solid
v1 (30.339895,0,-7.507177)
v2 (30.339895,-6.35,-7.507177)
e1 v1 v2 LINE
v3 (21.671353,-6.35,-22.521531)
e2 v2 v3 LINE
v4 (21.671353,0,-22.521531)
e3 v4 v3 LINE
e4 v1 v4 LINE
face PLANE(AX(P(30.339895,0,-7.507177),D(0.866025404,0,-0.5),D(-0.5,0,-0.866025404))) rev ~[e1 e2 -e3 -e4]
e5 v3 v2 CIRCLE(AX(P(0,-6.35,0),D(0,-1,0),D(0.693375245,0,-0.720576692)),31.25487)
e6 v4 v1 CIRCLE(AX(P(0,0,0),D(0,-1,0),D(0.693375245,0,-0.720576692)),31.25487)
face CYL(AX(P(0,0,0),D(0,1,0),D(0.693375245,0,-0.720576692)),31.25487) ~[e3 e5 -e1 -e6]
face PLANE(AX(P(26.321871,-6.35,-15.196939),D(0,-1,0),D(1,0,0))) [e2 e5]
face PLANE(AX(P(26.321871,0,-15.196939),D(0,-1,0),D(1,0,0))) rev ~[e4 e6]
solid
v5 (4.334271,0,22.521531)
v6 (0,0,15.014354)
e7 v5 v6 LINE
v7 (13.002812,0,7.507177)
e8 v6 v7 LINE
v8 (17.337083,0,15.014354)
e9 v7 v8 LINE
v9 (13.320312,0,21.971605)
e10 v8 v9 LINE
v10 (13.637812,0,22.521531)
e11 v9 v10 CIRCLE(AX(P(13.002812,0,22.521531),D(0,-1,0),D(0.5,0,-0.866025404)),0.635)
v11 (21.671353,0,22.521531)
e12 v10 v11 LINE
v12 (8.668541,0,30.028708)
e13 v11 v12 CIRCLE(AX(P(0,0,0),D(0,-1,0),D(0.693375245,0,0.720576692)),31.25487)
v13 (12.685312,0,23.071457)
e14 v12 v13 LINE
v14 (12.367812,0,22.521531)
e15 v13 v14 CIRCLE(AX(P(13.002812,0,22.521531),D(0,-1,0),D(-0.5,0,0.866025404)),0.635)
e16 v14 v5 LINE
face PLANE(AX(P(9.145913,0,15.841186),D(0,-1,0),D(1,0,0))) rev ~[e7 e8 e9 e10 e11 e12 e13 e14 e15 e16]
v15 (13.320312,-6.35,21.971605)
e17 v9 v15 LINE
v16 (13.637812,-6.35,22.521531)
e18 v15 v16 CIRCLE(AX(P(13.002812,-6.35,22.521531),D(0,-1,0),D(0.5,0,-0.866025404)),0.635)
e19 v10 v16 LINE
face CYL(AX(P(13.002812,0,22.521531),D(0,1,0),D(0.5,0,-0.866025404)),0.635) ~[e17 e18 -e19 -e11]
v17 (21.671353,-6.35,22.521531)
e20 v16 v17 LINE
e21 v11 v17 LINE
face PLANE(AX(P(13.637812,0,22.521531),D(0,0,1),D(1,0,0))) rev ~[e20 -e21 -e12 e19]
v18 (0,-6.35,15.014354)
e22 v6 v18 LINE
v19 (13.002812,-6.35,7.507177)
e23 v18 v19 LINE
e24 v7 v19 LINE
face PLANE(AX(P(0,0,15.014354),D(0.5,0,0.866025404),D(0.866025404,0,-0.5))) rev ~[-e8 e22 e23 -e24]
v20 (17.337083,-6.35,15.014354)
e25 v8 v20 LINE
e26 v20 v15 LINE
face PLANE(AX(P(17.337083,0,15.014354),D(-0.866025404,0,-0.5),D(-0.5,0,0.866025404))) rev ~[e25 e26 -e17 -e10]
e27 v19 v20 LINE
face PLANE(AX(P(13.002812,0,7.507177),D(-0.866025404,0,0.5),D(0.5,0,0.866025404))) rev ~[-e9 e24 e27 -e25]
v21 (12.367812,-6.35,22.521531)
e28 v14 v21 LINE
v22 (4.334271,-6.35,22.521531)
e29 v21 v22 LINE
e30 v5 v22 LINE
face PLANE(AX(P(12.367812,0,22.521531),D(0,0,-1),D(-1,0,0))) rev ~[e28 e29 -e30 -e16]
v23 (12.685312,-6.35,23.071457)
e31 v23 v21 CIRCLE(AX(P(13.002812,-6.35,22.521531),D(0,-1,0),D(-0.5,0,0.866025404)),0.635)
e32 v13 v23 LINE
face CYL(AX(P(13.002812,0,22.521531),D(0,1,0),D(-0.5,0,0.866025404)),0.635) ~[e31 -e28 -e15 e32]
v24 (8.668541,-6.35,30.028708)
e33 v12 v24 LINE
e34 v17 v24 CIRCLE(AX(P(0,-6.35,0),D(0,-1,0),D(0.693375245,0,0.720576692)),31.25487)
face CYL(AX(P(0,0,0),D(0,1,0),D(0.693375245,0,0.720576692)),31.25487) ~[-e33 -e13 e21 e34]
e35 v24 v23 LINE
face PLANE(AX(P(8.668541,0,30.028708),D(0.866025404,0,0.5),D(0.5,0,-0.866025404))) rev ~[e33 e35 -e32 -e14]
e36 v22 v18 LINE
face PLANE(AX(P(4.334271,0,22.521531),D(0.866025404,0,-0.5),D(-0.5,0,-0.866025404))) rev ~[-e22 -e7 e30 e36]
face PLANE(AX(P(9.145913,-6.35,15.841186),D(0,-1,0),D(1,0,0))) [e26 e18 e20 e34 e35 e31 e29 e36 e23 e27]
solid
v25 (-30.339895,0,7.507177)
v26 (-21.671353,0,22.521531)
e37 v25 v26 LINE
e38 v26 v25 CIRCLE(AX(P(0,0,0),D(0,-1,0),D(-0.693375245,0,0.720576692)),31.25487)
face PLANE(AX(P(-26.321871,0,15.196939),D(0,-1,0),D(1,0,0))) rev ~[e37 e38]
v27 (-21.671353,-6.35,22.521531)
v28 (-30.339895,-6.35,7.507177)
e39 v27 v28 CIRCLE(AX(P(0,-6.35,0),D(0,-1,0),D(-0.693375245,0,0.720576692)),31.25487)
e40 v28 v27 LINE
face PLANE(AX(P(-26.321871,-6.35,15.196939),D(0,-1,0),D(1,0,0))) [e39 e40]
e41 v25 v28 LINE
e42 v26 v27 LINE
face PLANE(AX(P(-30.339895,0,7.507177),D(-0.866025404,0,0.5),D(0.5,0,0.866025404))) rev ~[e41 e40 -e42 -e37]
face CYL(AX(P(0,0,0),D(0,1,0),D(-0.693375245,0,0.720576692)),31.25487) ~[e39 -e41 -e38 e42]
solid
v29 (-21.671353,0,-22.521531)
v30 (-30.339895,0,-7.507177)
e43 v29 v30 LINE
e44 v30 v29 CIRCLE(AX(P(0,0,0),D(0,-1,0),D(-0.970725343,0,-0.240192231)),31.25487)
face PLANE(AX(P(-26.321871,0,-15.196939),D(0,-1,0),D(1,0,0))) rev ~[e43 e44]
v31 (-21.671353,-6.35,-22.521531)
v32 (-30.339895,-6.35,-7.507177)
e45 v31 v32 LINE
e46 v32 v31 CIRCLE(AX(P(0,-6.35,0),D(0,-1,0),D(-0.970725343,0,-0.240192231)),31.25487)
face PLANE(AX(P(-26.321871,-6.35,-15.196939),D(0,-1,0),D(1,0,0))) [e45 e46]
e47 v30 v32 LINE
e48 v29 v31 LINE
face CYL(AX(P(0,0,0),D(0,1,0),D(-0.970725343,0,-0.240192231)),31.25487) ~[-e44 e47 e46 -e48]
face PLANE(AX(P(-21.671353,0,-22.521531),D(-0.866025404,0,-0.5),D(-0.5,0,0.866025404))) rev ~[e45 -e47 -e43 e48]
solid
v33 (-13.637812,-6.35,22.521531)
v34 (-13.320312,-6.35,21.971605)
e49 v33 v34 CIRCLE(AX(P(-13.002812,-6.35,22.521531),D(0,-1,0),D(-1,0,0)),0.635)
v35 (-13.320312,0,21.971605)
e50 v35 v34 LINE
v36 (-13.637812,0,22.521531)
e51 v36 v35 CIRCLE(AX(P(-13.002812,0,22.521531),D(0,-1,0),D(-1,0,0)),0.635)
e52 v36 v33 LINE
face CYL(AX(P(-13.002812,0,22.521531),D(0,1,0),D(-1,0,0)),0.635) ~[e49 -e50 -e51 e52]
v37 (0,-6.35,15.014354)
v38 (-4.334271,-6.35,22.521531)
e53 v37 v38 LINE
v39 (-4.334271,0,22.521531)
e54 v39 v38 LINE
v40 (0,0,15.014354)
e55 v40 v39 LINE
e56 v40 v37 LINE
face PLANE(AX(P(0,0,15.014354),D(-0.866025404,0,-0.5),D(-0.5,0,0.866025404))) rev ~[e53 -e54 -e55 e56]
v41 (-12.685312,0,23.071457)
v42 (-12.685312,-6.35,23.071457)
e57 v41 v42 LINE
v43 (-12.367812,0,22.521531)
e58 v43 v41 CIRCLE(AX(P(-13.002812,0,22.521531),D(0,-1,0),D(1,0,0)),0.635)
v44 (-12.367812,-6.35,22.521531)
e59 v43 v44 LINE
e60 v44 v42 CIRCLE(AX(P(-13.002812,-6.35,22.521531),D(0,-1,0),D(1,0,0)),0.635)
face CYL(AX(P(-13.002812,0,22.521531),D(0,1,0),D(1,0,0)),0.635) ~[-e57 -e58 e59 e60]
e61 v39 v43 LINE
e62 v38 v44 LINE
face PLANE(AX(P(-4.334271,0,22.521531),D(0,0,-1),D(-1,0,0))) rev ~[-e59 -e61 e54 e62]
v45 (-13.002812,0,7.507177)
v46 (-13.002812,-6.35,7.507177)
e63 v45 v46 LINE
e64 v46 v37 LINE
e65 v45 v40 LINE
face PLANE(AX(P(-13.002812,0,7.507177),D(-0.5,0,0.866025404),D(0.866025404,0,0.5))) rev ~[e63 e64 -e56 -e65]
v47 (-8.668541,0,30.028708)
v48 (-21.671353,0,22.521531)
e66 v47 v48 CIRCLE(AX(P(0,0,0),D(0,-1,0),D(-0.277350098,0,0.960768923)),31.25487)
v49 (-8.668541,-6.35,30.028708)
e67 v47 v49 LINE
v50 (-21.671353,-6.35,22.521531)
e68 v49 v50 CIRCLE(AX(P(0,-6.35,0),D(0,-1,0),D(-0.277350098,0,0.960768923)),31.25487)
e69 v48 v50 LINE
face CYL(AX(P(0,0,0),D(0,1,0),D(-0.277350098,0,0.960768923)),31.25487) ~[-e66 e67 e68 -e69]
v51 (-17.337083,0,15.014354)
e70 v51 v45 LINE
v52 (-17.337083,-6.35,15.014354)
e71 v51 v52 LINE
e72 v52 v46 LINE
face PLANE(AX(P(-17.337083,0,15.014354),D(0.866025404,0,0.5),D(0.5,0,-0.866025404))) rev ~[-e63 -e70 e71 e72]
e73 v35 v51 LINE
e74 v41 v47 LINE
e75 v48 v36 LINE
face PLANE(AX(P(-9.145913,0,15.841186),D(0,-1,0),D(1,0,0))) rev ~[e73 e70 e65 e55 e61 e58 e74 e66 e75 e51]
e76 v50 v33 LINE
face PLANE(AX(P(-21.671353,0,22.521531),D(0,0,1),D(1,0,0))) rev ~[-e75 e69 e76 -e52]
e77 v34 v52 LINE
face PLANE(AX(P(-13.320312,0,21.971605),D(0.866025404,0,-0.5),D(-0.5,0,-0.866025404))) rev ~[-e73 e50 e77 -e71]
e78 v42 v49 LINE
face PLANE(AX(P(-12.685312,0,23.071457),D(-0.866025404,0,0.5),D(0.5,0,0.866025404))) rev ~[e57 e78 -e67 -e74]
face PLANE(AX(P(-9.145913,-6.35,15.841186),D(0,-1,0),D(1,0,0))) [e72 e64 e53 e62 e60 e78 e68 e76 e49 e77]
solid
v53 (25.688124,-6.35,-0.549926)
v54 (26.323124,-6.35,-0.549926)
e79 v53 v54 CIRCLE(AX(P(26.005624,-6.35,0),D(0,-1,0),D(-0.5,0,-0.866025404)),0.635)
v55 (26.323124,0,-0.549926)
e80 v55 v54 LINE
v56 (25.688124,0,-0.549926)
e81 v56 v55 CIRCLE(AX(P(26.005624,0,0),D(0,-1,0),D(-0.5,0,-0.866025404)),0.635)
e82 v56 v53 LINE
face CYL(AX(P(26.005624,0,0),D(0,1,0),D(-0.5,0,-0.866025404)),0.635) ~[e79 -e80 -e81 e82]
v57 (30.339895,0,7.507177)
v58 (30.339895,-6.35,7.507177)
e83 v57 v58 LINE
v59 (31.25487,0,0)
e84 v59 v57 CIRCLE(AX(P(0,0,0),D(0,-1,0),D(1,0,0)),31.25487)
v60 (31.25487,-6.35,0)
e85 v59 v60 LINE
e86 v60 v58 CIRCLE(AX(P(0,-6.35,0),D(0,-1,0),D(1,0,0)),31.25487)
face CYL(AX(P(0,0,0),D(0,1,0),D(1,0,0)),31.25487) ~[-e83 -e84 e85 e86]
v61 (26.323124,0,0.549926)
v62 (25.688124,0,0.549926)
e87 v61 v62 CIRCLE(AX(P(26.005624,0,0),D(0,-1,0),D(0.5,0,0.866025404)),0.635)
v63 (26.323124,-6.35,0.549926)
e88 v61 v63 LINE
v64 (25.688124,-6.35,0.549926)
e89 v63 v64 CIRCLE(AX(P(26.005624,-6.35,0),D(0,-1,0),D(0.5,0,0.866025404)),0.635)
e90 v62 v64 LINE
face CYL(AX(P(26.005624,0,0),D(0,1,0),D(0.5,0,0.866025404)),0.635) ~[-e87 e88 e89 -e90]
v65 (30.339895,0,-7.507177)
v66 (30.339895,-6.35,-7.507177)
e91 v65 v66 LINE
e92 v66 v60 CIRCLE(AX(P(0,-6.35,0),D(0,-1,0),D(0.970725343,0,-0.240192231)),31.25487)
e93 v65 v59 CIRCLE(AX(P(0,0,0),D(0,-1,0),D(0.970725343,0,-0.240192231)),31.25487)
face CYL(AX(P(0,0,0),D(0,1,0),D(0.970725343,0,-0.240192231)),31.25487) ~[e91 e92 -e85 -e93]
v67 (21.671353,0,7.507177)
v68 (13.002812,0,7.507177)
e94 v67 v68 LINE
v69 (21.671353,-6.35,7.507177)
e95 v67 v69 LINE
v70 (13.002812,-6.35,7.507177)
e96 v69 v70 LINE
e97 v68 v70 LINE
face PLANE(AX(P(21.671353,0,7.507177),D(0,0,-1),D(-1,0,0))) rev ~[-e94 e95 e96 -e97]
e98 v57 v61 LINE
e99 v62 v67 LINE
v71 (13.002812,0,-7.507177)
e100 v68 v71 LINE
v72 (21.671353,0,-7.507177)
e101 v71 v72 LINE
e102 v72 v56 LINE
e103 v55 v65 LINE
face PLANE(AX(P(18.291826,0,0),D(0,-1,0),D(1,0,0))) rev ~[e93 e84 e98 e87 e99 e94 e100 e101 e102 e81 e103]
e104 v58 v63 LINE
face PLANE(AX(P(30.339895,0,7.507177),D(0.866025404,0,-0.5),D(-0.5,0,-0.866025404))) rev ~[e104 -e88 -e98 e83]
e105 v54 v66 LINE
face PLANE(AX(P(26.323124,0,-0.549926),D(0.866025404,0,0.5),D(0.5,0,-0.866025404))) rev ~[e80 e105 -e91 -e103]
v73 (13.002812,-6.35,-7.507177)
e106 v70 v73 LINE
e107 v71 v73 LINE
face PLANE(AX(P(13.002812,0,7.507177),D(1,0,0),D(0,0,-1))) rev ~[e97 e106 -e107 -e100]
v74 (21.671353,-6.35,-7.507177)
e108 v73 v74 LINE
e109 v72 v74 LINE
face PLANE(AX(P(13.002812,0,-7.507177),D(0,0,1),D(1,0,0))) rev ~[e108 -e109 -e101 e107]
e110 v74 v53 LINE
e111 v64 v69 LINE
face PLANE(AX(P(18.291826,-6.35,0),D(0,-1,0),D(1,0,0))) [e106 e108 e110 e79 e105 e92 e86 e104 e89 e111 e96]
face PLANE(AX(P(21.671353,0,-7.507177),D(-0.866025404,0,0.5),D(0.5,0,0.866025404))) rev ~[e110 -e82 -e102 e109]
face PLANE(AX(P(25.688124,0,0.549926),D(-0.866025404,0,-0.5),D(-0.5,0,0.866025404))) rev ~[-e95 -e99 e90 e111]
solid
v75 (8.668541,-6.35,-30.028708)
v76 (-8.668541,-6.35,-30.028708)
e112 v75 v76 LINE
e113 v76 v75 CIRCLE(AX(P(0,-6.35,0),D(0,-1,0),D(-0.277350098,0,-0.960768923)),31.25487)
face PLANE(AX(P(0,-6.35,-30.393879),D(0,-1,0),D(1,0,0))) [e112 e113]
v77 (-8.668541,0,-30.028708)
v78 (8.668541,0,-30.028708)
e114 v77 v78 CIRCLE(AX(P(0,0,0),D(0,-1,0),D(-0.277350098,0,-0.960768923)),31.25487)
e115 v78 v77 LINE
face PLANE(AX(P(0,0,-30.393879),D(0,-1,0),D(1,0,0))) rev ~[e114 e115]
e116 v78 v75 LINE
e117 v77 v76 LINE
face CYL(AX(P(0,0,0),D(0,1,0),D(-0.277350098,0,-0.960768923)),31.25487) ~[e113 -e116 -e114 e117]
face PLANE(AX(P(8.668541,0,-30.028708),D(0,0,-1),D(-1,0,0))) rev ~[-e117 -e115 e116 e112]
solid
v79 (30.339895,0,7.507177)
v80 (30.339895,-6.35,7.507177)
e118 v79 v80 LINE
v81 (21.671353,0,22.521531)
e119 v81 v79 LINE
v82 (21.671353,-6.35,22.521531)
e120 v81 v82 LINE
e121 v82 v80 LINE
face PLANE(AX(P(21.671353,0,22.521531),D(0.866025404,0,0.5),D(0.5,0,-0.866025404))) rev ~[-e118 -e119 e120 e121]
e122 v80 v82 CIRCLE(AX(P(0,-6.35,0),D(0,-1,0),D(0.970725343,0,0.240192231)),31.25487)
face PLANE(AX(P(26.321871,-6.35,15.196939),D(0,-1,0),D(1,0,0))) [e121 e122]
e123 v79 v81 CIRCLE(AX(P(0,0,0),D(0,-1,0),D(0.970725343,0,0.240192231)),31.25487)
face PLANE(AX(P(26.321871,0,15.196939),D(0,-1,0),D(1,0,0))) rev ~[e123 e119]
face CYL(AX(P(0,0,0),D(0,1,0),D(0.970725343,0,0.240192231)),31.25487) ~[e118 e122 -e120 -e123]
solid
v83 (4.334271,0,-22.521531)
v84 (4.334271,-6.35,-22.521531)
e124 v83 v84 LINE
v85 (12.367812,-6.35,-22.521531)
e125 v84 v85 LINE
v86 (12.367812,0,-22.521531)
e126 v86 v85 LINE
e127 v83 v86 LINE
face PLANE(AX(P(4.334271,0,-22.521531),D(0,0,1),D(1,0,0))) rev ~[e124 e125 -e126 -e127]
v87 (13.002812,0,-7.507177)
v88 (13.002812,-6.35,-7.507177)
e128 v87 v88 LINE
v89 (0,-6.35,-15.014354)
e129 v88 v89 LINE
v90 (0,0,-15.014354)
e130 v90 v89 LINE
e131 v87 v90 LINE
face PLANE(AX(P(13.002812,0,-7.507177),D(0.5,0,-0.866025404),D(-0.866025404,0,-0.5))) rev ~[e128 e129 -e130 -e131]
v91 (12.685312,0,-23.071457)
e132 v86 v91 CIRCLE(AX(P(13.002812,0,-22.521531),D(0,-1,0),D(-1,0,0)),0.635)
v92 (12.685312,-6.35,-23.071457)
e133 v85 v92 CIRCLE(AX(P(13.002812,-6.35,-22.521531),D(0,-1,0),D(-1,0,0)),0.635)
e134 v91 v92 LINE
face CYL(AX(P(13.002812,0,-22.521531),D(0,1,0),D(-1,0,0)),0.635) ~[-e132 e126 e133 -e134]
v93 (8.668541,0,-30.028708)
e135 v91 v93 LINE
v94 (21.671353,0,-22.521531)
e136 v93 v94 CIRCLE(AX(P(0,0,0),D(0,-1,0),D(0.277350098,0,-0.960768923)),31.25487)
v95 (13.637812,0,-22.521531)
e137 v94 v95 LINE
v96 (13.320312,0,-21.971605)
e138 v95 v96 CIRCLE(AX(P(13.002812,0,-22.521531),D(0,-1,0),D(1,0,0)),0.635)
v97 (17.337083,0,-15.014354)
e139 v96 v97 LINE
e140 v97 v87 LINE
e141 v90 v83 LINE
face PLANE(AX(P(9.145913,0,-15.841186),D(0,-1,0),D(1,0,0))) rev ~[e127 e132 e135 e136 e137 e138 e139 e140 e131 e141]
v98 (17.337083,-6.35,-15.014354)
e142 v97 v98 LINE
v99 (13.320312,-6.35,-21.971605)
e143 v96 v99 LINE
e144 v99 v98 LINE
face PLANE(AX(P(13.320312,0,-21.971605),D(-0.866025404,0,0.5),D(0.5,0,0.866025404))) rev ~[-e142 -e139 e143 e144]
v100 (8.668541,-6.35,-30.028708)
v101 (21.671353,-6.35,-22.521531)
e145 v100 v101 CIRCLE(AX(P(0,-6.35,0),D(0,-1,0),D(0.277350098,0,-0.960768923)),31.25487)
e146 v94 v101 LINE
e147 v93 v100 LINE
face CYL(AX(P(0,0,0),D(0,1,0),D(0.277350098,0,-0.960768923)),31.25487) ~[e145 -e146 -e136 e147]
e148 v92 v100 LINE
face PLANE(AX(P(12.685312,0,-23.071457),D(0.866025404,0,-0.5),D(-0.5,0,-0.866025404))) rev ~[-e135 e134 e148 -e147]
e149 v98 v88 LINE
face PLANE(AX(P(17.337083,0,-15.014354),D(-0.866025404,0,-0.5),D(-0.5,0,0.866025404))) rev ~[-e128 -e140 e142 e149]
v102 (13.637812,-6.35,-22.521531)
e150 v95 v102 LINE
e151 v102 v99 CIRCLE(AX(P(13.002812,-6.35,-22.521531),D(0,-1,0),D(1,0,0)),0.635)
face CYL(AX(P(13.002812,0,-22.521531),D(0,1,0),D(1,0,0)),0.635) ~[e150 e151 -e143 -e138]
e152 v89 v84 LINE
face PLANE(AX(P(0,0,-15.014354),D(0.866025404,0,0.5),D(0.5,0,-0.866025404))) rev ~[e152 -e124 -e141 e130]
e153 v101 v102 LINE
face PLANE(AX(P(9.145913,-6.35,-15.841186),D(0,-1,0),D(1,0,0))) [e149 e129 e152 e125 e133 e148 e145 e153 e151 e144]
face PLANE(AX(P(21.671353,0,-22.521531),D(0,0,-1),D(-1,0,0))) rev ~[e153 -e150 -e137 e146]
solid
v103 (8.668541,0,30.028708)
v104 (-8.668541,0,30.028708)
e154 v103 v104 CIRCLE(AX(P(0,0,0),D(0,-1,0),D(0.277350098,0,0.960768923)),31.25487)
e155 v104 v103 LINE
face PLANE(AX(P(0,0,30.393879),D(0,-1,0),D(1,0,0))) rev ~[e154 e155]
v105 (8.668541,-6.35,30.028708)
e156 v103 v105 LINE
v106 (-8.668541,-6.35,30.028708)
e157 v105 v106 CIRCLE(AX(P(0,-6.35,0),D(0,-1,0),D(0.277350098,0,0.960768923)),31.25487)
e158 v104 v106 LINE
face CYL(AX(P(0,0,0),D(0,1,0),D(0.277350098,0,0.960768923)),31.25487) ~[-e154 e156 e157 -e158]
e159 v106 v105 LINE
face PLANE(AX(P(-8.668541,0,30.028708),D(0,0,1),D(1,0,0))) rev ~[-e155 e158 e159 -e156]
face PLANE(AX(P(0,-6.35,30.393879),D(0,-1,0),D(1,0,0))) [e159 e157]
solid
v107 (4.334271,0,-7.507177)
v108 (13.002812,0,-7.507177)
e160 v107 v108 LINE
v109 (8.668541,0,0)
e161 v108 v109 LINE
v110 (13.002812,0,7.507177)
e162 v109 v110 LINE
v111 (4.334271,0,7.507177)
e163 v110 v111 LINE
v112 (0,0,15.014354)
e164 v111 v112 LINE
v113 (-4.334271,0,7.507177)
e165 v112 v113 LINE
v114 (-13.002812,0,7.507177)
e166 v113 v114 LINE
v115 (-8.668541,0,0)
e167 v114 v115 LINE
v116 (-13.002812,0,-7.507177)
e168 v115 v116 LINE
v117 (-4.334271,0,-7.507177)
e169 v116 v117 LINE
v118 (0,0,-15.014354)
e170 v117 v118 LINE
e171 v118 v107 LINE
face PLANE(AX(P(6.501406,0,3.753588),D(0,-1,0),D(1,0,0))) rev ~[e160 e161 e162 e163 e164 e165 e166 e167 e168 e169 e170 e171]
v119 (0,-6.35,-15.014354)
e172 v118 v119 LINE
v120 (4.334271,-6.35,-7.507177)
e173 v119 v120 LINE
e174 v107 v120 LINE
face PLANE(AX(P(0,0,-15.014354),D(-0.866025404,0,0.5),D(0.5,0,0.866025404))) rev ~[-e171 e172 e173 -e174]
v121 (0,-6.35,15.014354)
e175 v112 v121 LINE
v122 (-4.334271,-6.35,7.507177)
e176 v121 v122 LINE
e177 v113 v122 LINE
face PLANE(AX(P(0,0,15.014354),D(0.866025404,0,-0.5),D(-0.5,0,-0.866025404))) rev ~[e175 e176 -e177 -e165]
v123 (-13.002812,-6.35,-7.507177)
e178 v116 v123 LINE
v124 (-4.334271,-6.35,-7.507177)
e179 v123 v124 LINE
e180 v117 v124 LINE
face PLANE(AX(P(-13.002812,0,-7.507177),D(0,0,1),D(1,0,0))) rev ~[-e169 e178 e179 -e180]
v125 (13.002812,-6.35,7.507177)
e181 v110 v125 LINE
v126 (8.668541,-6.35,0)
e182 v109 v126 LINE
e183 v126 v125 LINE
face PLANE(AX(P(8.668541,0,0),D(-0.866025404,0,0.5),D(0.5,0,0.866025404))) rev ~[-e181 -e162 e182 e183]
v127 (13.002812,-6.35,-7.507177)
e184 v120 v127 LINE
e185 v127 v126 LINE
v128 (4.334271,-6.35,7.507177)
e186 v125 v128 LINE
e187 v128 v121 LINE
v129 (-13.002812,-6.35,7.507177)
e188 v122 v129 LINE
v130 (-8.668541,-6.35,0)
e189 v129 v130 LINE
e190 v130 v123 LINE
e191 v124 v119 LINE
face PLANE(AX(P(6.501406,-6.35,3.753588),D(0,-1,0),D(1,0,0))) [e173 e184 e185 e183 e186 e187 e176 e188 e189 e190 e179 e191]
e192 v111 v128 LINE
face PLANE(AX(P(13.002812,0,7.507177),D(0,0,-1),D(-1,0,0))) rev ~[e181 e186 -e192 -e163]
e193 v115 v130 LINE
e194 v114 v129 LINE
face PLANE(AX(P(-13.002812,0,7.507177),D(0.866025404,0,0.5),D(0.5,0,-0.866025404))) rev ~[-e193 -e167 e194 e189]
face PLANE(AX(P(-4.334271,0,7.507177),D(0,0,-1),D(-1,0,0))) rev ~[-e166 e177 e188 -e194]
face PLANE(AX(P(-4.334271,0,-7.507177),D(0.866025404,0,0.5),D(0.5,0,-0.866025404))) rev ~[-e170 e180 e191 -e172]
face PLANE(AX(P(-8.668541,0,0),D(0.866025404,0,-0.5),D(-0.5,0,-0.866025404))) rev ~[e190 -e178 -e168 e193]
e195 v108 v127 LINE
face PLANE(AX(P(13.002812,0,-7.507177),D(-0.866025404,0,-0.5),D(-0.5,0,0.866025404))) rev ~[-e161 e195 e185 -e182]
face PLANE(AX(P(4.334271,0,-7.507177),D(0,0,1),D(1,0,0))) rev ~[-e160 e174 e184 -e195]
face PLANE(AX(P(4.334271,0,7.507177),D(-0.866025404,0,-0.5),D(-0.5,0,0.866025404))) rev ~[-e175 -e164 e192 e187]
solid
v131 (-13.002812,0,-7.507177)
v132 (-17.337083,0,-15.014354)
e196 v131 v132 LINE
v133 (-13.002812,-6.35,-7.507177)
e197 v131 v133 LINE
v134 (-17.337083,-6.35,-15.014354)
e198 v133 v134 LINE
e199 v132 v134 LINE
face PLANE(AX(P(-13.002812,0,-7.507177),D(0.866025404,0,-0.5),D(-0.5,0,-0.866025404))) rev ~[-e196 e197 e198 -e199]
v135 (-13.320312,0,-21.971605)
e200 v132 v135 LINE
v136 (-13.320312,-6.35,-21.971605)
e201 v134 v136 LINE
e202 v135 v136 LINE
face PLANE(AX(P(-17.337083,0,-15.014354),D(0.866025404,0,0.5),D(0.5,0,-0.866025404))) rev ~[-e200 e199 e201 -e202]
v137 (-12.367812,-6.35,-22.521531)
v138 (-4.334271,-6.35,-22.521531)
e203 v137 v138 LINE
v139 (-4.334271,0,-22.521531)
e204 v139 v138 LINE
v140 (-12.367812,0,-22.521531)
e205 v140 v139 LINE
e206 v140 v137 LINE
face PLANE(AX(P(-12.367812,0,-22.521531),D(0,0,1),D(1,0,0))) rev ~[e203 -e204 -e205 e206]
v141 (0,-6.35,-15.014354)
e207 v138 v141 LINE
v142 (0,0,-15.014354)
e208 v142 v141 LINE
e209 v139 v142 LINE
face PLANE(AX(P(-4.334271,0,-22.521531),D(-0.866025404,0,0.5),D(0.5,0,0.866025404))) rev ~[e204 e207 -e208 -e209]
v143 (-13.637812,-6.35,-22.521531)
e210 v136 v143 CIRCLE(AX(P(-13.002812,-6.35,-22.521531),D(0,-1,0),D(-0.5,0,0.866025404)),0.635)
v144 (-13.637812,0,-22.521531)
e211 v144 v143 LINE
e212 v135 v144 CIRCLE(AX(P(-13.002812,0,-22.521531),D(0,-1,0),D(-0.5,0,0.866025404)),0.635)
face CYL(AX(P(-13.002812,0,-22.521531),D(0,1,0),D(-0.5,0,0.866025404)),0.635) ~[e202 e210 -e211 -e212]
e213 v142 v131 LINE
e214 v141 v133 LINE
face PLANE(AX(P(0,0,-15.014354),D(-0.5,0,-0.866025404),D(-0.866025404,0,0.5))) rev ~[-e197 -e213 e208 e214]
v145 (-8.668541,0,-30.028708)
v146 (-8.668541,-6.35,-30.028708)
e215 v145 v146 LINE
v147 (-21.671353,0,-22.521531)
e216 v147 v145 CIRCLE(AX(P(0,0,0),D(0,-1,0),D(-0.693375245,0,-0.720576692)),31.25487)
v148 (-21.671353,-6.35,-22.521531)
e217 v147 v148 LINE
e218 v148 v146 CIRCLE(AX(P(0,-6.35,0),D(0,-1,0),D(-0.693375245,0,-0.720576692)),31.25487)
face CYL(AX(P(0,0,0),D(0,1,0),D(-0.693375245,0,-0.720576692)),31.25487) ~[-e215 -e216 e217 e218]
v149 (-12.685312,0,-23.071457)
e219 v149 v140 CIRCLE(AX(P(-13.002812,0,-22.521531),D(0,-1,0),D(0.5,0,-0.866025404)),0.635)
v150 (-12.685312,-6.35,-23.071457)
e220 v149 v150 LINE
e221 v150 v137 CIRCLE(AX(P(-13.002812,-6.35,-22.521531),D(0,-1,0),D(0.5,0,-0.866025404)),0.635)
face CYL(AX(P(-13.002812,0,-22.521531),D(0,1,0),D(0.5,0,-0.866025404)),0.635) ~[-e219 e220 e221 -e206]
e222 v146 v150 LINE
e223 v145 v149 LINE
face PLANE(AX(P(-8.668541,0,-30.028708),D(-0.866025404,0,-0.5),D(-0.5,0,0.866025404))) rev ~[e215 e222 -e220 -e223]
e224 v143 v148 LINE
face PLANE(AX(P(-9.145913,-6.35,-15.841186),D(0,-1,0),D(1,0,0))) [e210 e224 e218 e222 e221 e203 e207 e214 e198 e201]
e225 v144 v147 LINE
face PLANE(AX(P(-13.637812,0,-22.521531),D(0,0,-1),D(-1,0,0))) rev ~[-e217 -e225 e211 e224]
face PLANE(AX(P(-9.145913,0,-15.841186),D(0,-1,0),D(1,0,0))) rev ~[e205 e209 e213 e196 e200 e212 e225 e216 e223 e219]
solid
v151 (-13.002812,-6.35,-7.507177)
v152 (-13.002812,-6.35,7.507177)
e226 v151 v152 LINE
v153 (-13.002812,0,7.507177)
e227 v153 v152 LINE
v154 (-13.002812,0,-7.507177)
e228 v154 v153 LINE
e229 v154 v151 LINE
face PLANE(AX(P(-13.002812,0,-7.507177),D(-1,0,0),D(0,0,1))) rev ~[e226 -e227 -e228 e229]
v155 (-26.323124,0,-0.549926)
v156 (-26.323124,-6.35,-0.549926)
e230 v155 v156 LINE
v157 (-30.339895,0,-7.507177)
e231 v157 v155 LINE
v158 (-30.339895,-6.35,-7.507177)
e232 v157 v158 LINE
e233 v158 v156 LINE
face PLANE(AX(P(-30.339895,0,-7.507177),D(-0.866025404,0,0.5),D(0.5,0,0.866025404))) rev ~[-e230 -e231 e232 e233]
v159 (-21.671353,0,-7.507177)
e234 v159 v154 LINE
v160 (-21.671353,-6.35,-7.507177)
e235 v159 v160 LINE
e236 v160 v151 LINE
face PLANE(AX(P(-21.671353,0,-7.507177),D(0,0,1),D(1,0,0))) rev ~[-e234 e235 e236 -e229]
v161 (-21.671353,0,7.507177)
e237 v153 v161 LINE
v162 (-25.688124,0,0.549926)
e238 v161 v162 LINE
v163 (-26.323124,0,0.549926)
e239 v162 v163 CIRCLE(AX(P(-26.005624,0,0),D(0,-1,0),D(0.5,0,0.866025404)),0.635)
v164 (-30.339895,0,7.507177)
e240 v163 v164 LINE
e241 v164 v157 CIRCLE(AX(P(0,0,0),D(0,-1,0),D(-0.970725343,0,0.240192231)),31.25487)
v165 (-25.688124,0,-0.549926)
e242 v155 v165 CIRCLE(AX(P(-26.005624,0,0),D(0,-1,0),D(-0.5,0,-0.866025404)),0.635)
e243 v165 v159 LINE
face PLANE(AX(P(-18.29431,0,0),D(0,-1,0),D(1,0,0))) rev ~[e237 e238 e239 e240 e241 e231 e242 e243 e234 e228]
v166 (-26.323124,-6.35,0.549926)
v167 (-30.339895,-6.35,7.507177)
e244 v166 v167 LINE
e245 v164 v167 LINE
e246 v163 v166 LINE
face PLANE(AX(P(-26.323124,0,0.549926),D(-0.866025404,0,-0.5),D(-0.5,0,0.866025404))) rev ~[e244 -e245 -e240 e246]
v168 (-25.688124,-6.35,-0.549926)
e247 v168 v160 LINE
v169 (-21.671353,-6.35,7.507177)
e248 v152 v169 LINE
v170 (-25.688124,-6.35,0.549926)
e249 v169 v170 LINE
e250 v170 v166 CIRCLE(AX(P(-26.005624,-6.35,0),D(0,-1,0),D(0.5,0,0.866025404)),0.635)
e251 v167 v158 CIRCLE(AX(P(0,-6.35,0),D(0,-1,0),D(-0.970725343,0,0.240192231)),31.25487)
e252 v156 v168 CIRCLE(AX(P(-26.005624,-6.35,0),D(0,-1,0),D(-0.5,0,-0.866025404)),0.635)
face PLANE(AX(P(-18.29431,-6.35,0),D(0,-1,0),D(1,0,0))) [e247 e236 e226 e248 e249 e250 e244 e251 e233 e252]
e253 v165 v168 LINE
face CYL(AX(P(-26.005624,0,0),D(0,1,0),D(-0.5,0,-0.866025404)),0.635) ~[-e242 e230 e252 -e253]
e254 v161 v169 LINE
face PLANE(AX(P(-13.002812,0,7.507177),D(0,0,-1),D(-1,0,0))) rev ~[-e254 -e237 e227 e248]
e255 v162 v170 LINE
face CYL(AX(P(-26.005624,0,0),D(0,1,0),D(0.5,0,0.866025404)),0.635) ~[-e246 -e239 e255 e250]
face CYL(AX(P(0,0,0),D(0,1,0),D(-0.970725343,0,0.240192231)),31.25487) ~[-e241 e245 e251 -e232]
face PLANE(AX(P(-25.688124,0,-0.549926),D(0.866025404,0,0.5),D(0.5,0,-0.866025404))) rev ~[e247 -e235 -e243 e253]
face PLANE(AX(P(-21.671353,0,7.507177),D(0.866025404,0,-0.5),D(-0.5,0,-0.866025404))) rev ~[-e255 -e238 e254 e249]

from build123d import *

# Parameters (mm, degrees)
F1_DEPTH = 6.35


# Not quite as in the source:
# - a feature names something its author has since deleted; it is built from what else it names


with BuildPart() as f1:
    # F0 (on Front) → F1 (new body)
    with BuildSketch(Plane.XZ):
        with BuildLine():
            Line((21.6713532185, 7.5071769686), (13.0028119311, 7.5071769686))
            Line((13.0028119311, 7.5071769686), (13.0028119311, -7.5071769686))
            Line((13.0028119311, -7.5071769686), (21.6713532185, -7.5071769686))
            Line((21.6713532185, -7.5071769686), (25.6881238621, -0.5499261314))
            ThreePointArc((25.6881238621, -0.5499261314), (25.3706238621, 0), (25.6881238621, 0.5499261314))
            Line((25.6881238621, 0.5499261314), (21.6713532185, 7.5071769686))
        make_face()
        with BuildLine():
            ThreePointArc((26.3231238621, 0.5499261314), (26.0056238621, 0.635), (25.6881238621, 0.5499261314))
            ThreePointArc((25.6881238621, 0.5499261314), (25.3706238621, 0), (25.6881238621, -0.5499261314))
            ThreePointArc((25.6881238621, -0.5499261314), (26.0056238621, -0.635), (26.3231238621, -0.5499261314))
            ThreePointArc((26.3231238621, -0.5499261314), (26.5555499936, -0.3175), (26.6406238621, 0))
            ThreePointArc((26.6406238621, 0), (26.5555499936, 0.3175), (26.3231238621, 0.5499261314))
        make_face()
        with BuildLine():
            Line((30.3398945058, 7.5071769686), (26.3231238621, 0.5499261314))
            ThreePointArc((26.3231238621, 0.5499261314), (26.5555499936, 0.3175), (26.6406238621, 0))
            ThreePointArc((26.6406238621, 0), (26.5555499936, -0.3175), (26.3231238621, -0.5499261314))
            Line((26.3231238621, -0.5499261314), (30.3398945058, -7.5071769686))
            ThreePointArc((30.3398945058, -7.5071769686), (31.0252829652, -3.7813650434), (31.2548700951, 0))
            ThreePointArc((31.2548700951, 0), (31.0252829652, 3.7813650434), (30.3398945058, 7.5071769686))
        make_face()
    extrude(amount=F1_DEPTH)


with BuildPart() as f1b:
    # F0 (on Front) → F1, piece 2 (new body)
    with BuildSketch(Plane.XZ):
        with BuildLine():
            Line((0, 15.0143539373), (13.0028119311, 7.5071769686))
            Line((13.0028119311, 7.5071769686), (17.3370825748, 15.0143539373))
            Line((17.3370825748, 15.0143539373), (13.3203119311, 21.9716047745))
            ThreePointArc((13.3203119311, 21.9716047745), (12.6853119311, 21.9716047745), (12.3678119311, 22.5215309059))
            Line((12.3678119311, 22.5215309059), (4.3342706437, 22.5215309059))
            Line((4.3342706437, 22.5215309059), (0, 15.0143539373))
        make_face()
        with BuildLine():
            ThreePointArc((12.3678119311, 22.5215309059), (12.6853119311, 21.9716047745), (13.3203119311, 21.9716047745))
            ThreePointArc((13.3203119311, 21.9716047745), (13.5527380625, 22.2040309059), (13.6378119311, 22.5215309059))
            ThreePointArc((13.6378119311, 22.5215309059), (13.3203119311, 23.0714570373), (12.6853119311, 23.0714570373))
            ThreePointArc((12.6853119311, 23.0714570373), (12.4528857997, 22.8390309059), (12.3678119311, 22.5215309059))
        make_face()
        with BuildLine():
            ThreePointArc((12.6853119311, 23.0714570373), (13.3203119311, 23.0714570373), (13.6378119311, 22.5215309059))
            Line((13.6378119311, 22.5215309059), (21.6713532185, 22.5215309059))
            ThreePointArc((21.6713532185, 22.5215309059), (15.6274350476, 27.0675114944), (8.6685412874, 30.0287078745))
            Line((8.6685412874, 30.0287078745), (12.6853119311, 23.0714570373))
        make_face()
    extrude(amount=F1_DEPTH)


with BuildPart() as f1c:
    # F0 (on Front) → F1, piece 3 (new body)
    with BuildSketch(Plane.XZ):
        Polygon((8.6685412874, 0), (13.0028119311, 7.5071769686), (4.3342706437, 7.5071769686), (0, 0), align=None)
        Polygon((4.3342706437, -7.5071769686), (13.0028119311, -7.5071769686), (8.6685412874, 0), (0, 0), align=None)
        Polygon((4.3342706437, 7.5071769686), (0, 15.0143539373), (-4.3342706437, 7.5071769686), (0, 0), align=None)
        Polygon((-4.3342706437, -7.5071769686), (0, -15.0143539373), (4.3342706437, -7.5071769686), (0, 0), align=None)
        Polygon((-4.3342706437, 7.5071769686), (-13.0028119311, 7.5071769686), (-8.6685412874, 0), (0, 0), align=None)
        Polygon((-4.3342706437, -7.5071769686), (0, 0), (-8.6685412874, 0), (-13.0028119311, -7.5071769686), align=None)
    extrude(amount=F1_DEPTH)


with BuildPart() as f1d:
    # F0 (on Front) → F1, piece 4 (new body)
    with BuildSketch(Plane.XZ):
        with BuildLine():
            Line((17.3370825748, -15.0143539373), (13.0028119311, -7.5071769686))
            Line((13.0028119311, -7.5071769686), (0, -15.0143539373))
            Line((0, -15.0143539373), (4.3342706437, -22.5215309059))
            Line((4.3342706437, -22.5215309059), (12.3678119311, -22.5215309059))
            ThreePointArc((12.3678119311, -22.5215309059), (12.6853119311, -21.9716047745), (13.3203119311, -21.9716047745))
            Line((13.3203119311, -21.9716047745), (17.3370825748, -15.0143539373))
        make_face()
        with BuildLine():
            ThreePointArc((13.6378119311, -22.5215309059), (13.5527380625, -22.2040309059), (13.3203119311, -21.9716047745))
            ThreePointArc((13.3203119311, -21.9716047745), (12.6853119311, -21.9716047745), (12.3678119311, -22.5215309059))
            ThreePointArc((12.3678119311, -22.5215309059), (12.4528857997, -22.8390309059), (12.6853119311, -23.0714570373))
            ThreePointArc((12.6853119311, -23.0714570373), (13.3203119311, -23.0714570373), (13.6378119311, -22.5215309059))
        make_face()
        with BuildLine():
            Line((21.6713532185, -22.5215309059), (13.6378119311, -22.5215309059))
            ThreePointArc((13.6378119311, -22.5215309059), (13.3203119311, -23.0714570373), (12.6853119311, -23.0714570373))
            Line((12.6853119311, -23.0714570373), (8.6685412874, -30.0287078745))
            ThreePointArc((8.6685412874, -30.0287078745), (15.6274350476, -27.0675114944), (21.6713532185, -22.5215309059))
        make_face()
    extrude(amount=F1_DEPTH)


with BuildPart() as f1e:
    # F0 (on Front) → F1, piece 5 (new body)
    with BuildSketch(Plane.XZ):
        with BuildLine():
            Line((-13.0028119311, 7.5071769686), (0, 15.0143539373))
            Line((0, 15.0143539373), (-4.3342706437, 22.5215309059))
            Line((-4.3342706437, 22.5215309059), (-12.3678119311, 22.5215309059))
            ThreePointArc((-12.3678119311, 22.5215309059), (-12.6853119311, 21.9716047745), (-13.3203119311, 21.9716047745))
            Line((-13.3203119311, 21.9716047745), (-17.3370825748, 15.0143539373))
            Line((-17.3370825748, 15.0143539373), (-13.0028119311, 7.5071769686))
        make_face()
        with BuildLine():
            ThreePointArc((-13.3203119311, 21.9716047745), (-12.6853119311, 21.9716047745), (-12.3678119311, 22.5215309059))
            ThreePointArc((-12.3678119311, 22.5215309059), (-12.4528857997, 22.8390309059), (-12.6853119311, 23.0714570373))
            ThreePointArc((-12.6853119311, 23.0714570373), (-13.3203119311, 23.0714570373), (-13.6378119311, 22.5215309059))
            ThreePointArc((-13.6378119311, 22.5215309059), (-13.5527380625, 22.2040309059), (-13.3203119311, 21.9716047745))
        make_face()
        with BuildLine():
            ThreePointArc((-13.6378119311, 22.5215309059), (-13.3203119311, 23.0714570373), (-12.6853119311, 23.0714570373))
            Line((-12.6853119311, 23.0714570373), (-8.6685412874, 30.0287078745))
            ThreePointArc((-8.6685412874, 30.0287078745), (-15.6274350476, 27.0675114944), (-21.6713532185, 22.5215309059))
            Line((-21.6713532185, 22.5215309059), (-13.6378119311, 22.5215309059))
        make_face()
    extrude(amount=F1_DEPTH)


with BuildPart() as f1f:
    # F0 (on Front) → F1, piece 6 (new body)
    with BuildSketch(Plane.XZ):
        with BuildLine():
            Line((-4.3342706437, -22.5215309059), (0, -15.0143539373))
            Line((0, -15.0143539373), (-13.0028119311, -7.5071769686))
            Line((-13.0028119311, -7.5071769686), (-17.3370825748, -15.0143539373))
            Line((-17.3370825748, -15.0143539373), (-13.3203119311, -21.9716047745))
            ThreePointArc((-13.3203119311, -21.9716047745), (-12.6853119311, -21.9716047745), (-12.3678119311, -22.5215309059))
            Line((-12.3678119311, -22.5215309059), (-4.3342706437, -22.5215309059))
        make_face()
        with BuildLine():
            ThreePointArc((-12.6853119311, -23.0714570373), (-12.4528857997, -22.8390309059), (-12.3678119311, -22.5215309059))
            ThreePointArc((-12.3678119311, -22.5215309059), (-12.6853119311, -21.9716047745), (-13.3203119311, -21.9716047745))
            ThreePointArc((-13.3203119311, -21.9716047745), (-13.5527380625, -22.2040309059), (-13.6378119311, -22.5215309059))
            ThreePointArc((-13.6378119311, -22.5215309059), (-13.3203119311, -23.0714570373), (-12.6853119311, -23.0714570373))
        make_face()
        with BuildLine():
            Line((-8.6685412874, -30.0287078745), (-12.6853119311, -23.0714570373))
            ThreePointArc((-12.6853119311, -23.0714570373), (-13.3203119311, -23.0714570373), (-13.6378119311, -22.5215309059))
            Line((-13.6378119311, -22.5215309059), (-21.6713532185, -22.5215309059))
            ThreePointArc((-21.6713532185, -22.5215309059), (-15.6274350476, -27.0675114944), (-8.6685412874, -30.0287078745))
        make_face()
    extrude(amount=F1_DEPTH)


with BuildPart() as f1g:
    # F0 (on Front) → F1, piece 7 (new body)
    with BuildSketch(Plane.XZ):
        with BuildLine():
            Line((-13.0028119311, -7.5071769686), (-13.0028119311, 7.5071769686))
            Line((-13.0028119311, 7.5071769686), (-21.6713532185, 7.5071769686))
            Line((-21.6713532185, 7.5071769686), (-25.6881238621, 0.5499261314))
            ThreePointArc((-25.6881238621, 0.5499261314), (-25.4556977307, 0.3175), (-25.3706238621, 0))
            ThreePointArc((-25.3706238621, 0), (-25.4556977307, -0.3175), (-25.6881238621, -0.5499261314))
            Line((-25.6881238621, -0.5499261314), (-21.6713532185, -7.5071769686))
            Line((-21.6713532185, -7.5071769686), (-13.0028119311, -7.5071769686))
        make_face()
        with BuildLine():
            ThreePointArc((-25.3706238621, 0), (-25.4556977307, 0.3175), (-25.6881238621, 0.5499261314))
            ThreePointArc((-25.6881238621, 0.5499261314), (-26.0056238621, 0.635), (-26.3231238621, 0.5499261314))
            ThreePointArc((-26.3231238621, 0.5499261314), (-26.6406238621, 0), (-26.3231238621, -0.5499261314))
            ThreePointArc((-26.3231238621, -0.5499261314), (-26.0056238621, -0.635), (-25.6881238621, -0.5499261314))
            ThreePointArc((-25.6881238621, -0.5499261314), (-25.4556977307, -0.3175), (-25.3706238621, 0))
        make_face()
        with BuildLine():
            ThreePointArc((-26.3231238621, -0.5499261314), (-26.6406238621, 0), (-26.3231238621, 0.5499261314))
            Line((-26.3231238621, 0.5499261314), (-30.3398945058, 7.5071769686))
            ThreePointArc((-30.3398945058, 7.5071769686), (-31.2548700951, 0), (-30.3398945058, -7.5071769686))
            Line((-30.3398945058, -7.5071769686), (-26.3231238621, -0.5499261314))
        make_face()
    extrude(amount=F1_DEPTH)


with BuildPart() as f1h:
    # F0 (on Front) → F1, piece 8 (new body)
    with BuildSketch(Plane.XZ):
        with BuildLine():
            ThreePointArc((30.3398945058, 7.5071769686), (27.0675114944, 15.6274350476), (21.6713532185, 22.5215309059))
            Line((21.6713532185, 22.5215309059), (30.3398945058, 7.5071769686))
        make_face()
    extrude(amount=F1_DEPTH)


with BuildPart() as f1i:
    # F0 (on Front) → F1, piece 9 (new body)
    with BuildSketch(Plane.XZ):
        with BuildLine():
            Line((30.3398945058, -7.5071769686), (21.6713532185, -22.5215309059))
            ThreePointArc((21.6713532185, -22.5215309059), (27.0675114944, -15.6274350476), (30.3398945058, -7.5071769686))
        make_face()
    extrude(amount=F1_DEPTH)


with BuildPart() as f1j:
    # F0 (on Front) → F1, piece 10 (new body)
    with BuildSketch(Plane.XZ):
        with BuildLine():
            ThreePointArc((8.6685412874, 30.0287078745), (0, 31.2548700951), (-8.6685412874, 30.0287078745))
            Line((-8.6685412874, 30.0287078745), (8.6685412874, 30.0287078745))
        make_face()
    extrude(amount=F1_DEPTH)


with BuildPart() as f1k:
    # F0 (on Front) → F1, piece 11 (new body)
    with BuildSketch(Plane.XZ):
        with BuildLine():
            ThreePointArc((-8.6685412874, -30.0287078745), (0, -31.2548700951), (8.6685412874, -30.0287078745))
            Line((8.6685412874, -30.0287078745), (-8.6685412874, -30.0287078745))
        make_face()
    extrude(amount=F1_DEPTH)


with BuildPart() as f1l:
    # F0 (on Front) → F1, piece 12 (new body)
    with BuildSketch(Plane.XZ):
        with BuildLine():
            Line((-30.3398945058, 7.5071769686), (-21.6713532185, 22.5215309059))
            ThreePointArc((-21.6713532185, 22.5215309059), (-27.0675114944, 15.6274350476), (-30.3398945058, 7.5071769686))
        make_face()
    extrude(amount=F1_DEPTH)


with BuildPart() as f1m:
    # F0 (on Front) → F1, piece 13 (new body)
    with BuildSketch(Plane.XZ):
        with BuildLine():
            ThreePointArc((-30.3398945058, -7.5071769686), (-27.0675114944, -15.6274350476), (-21.6713532185, -22.5215309059))
            Line((-21.6713532185, -22.5215309059), (-30.3398945058, -7.5071769686))
        make_face()
    extrude(amount=F1_DEPTH)


solid = Compound([f1.part, f1b.part, f1c.part, f1d.part, f1e.part, f1f.part, f1g.part, f1h.part, f1i.part, f1j.part, f1k.part, f1l.part, f1m.part])
